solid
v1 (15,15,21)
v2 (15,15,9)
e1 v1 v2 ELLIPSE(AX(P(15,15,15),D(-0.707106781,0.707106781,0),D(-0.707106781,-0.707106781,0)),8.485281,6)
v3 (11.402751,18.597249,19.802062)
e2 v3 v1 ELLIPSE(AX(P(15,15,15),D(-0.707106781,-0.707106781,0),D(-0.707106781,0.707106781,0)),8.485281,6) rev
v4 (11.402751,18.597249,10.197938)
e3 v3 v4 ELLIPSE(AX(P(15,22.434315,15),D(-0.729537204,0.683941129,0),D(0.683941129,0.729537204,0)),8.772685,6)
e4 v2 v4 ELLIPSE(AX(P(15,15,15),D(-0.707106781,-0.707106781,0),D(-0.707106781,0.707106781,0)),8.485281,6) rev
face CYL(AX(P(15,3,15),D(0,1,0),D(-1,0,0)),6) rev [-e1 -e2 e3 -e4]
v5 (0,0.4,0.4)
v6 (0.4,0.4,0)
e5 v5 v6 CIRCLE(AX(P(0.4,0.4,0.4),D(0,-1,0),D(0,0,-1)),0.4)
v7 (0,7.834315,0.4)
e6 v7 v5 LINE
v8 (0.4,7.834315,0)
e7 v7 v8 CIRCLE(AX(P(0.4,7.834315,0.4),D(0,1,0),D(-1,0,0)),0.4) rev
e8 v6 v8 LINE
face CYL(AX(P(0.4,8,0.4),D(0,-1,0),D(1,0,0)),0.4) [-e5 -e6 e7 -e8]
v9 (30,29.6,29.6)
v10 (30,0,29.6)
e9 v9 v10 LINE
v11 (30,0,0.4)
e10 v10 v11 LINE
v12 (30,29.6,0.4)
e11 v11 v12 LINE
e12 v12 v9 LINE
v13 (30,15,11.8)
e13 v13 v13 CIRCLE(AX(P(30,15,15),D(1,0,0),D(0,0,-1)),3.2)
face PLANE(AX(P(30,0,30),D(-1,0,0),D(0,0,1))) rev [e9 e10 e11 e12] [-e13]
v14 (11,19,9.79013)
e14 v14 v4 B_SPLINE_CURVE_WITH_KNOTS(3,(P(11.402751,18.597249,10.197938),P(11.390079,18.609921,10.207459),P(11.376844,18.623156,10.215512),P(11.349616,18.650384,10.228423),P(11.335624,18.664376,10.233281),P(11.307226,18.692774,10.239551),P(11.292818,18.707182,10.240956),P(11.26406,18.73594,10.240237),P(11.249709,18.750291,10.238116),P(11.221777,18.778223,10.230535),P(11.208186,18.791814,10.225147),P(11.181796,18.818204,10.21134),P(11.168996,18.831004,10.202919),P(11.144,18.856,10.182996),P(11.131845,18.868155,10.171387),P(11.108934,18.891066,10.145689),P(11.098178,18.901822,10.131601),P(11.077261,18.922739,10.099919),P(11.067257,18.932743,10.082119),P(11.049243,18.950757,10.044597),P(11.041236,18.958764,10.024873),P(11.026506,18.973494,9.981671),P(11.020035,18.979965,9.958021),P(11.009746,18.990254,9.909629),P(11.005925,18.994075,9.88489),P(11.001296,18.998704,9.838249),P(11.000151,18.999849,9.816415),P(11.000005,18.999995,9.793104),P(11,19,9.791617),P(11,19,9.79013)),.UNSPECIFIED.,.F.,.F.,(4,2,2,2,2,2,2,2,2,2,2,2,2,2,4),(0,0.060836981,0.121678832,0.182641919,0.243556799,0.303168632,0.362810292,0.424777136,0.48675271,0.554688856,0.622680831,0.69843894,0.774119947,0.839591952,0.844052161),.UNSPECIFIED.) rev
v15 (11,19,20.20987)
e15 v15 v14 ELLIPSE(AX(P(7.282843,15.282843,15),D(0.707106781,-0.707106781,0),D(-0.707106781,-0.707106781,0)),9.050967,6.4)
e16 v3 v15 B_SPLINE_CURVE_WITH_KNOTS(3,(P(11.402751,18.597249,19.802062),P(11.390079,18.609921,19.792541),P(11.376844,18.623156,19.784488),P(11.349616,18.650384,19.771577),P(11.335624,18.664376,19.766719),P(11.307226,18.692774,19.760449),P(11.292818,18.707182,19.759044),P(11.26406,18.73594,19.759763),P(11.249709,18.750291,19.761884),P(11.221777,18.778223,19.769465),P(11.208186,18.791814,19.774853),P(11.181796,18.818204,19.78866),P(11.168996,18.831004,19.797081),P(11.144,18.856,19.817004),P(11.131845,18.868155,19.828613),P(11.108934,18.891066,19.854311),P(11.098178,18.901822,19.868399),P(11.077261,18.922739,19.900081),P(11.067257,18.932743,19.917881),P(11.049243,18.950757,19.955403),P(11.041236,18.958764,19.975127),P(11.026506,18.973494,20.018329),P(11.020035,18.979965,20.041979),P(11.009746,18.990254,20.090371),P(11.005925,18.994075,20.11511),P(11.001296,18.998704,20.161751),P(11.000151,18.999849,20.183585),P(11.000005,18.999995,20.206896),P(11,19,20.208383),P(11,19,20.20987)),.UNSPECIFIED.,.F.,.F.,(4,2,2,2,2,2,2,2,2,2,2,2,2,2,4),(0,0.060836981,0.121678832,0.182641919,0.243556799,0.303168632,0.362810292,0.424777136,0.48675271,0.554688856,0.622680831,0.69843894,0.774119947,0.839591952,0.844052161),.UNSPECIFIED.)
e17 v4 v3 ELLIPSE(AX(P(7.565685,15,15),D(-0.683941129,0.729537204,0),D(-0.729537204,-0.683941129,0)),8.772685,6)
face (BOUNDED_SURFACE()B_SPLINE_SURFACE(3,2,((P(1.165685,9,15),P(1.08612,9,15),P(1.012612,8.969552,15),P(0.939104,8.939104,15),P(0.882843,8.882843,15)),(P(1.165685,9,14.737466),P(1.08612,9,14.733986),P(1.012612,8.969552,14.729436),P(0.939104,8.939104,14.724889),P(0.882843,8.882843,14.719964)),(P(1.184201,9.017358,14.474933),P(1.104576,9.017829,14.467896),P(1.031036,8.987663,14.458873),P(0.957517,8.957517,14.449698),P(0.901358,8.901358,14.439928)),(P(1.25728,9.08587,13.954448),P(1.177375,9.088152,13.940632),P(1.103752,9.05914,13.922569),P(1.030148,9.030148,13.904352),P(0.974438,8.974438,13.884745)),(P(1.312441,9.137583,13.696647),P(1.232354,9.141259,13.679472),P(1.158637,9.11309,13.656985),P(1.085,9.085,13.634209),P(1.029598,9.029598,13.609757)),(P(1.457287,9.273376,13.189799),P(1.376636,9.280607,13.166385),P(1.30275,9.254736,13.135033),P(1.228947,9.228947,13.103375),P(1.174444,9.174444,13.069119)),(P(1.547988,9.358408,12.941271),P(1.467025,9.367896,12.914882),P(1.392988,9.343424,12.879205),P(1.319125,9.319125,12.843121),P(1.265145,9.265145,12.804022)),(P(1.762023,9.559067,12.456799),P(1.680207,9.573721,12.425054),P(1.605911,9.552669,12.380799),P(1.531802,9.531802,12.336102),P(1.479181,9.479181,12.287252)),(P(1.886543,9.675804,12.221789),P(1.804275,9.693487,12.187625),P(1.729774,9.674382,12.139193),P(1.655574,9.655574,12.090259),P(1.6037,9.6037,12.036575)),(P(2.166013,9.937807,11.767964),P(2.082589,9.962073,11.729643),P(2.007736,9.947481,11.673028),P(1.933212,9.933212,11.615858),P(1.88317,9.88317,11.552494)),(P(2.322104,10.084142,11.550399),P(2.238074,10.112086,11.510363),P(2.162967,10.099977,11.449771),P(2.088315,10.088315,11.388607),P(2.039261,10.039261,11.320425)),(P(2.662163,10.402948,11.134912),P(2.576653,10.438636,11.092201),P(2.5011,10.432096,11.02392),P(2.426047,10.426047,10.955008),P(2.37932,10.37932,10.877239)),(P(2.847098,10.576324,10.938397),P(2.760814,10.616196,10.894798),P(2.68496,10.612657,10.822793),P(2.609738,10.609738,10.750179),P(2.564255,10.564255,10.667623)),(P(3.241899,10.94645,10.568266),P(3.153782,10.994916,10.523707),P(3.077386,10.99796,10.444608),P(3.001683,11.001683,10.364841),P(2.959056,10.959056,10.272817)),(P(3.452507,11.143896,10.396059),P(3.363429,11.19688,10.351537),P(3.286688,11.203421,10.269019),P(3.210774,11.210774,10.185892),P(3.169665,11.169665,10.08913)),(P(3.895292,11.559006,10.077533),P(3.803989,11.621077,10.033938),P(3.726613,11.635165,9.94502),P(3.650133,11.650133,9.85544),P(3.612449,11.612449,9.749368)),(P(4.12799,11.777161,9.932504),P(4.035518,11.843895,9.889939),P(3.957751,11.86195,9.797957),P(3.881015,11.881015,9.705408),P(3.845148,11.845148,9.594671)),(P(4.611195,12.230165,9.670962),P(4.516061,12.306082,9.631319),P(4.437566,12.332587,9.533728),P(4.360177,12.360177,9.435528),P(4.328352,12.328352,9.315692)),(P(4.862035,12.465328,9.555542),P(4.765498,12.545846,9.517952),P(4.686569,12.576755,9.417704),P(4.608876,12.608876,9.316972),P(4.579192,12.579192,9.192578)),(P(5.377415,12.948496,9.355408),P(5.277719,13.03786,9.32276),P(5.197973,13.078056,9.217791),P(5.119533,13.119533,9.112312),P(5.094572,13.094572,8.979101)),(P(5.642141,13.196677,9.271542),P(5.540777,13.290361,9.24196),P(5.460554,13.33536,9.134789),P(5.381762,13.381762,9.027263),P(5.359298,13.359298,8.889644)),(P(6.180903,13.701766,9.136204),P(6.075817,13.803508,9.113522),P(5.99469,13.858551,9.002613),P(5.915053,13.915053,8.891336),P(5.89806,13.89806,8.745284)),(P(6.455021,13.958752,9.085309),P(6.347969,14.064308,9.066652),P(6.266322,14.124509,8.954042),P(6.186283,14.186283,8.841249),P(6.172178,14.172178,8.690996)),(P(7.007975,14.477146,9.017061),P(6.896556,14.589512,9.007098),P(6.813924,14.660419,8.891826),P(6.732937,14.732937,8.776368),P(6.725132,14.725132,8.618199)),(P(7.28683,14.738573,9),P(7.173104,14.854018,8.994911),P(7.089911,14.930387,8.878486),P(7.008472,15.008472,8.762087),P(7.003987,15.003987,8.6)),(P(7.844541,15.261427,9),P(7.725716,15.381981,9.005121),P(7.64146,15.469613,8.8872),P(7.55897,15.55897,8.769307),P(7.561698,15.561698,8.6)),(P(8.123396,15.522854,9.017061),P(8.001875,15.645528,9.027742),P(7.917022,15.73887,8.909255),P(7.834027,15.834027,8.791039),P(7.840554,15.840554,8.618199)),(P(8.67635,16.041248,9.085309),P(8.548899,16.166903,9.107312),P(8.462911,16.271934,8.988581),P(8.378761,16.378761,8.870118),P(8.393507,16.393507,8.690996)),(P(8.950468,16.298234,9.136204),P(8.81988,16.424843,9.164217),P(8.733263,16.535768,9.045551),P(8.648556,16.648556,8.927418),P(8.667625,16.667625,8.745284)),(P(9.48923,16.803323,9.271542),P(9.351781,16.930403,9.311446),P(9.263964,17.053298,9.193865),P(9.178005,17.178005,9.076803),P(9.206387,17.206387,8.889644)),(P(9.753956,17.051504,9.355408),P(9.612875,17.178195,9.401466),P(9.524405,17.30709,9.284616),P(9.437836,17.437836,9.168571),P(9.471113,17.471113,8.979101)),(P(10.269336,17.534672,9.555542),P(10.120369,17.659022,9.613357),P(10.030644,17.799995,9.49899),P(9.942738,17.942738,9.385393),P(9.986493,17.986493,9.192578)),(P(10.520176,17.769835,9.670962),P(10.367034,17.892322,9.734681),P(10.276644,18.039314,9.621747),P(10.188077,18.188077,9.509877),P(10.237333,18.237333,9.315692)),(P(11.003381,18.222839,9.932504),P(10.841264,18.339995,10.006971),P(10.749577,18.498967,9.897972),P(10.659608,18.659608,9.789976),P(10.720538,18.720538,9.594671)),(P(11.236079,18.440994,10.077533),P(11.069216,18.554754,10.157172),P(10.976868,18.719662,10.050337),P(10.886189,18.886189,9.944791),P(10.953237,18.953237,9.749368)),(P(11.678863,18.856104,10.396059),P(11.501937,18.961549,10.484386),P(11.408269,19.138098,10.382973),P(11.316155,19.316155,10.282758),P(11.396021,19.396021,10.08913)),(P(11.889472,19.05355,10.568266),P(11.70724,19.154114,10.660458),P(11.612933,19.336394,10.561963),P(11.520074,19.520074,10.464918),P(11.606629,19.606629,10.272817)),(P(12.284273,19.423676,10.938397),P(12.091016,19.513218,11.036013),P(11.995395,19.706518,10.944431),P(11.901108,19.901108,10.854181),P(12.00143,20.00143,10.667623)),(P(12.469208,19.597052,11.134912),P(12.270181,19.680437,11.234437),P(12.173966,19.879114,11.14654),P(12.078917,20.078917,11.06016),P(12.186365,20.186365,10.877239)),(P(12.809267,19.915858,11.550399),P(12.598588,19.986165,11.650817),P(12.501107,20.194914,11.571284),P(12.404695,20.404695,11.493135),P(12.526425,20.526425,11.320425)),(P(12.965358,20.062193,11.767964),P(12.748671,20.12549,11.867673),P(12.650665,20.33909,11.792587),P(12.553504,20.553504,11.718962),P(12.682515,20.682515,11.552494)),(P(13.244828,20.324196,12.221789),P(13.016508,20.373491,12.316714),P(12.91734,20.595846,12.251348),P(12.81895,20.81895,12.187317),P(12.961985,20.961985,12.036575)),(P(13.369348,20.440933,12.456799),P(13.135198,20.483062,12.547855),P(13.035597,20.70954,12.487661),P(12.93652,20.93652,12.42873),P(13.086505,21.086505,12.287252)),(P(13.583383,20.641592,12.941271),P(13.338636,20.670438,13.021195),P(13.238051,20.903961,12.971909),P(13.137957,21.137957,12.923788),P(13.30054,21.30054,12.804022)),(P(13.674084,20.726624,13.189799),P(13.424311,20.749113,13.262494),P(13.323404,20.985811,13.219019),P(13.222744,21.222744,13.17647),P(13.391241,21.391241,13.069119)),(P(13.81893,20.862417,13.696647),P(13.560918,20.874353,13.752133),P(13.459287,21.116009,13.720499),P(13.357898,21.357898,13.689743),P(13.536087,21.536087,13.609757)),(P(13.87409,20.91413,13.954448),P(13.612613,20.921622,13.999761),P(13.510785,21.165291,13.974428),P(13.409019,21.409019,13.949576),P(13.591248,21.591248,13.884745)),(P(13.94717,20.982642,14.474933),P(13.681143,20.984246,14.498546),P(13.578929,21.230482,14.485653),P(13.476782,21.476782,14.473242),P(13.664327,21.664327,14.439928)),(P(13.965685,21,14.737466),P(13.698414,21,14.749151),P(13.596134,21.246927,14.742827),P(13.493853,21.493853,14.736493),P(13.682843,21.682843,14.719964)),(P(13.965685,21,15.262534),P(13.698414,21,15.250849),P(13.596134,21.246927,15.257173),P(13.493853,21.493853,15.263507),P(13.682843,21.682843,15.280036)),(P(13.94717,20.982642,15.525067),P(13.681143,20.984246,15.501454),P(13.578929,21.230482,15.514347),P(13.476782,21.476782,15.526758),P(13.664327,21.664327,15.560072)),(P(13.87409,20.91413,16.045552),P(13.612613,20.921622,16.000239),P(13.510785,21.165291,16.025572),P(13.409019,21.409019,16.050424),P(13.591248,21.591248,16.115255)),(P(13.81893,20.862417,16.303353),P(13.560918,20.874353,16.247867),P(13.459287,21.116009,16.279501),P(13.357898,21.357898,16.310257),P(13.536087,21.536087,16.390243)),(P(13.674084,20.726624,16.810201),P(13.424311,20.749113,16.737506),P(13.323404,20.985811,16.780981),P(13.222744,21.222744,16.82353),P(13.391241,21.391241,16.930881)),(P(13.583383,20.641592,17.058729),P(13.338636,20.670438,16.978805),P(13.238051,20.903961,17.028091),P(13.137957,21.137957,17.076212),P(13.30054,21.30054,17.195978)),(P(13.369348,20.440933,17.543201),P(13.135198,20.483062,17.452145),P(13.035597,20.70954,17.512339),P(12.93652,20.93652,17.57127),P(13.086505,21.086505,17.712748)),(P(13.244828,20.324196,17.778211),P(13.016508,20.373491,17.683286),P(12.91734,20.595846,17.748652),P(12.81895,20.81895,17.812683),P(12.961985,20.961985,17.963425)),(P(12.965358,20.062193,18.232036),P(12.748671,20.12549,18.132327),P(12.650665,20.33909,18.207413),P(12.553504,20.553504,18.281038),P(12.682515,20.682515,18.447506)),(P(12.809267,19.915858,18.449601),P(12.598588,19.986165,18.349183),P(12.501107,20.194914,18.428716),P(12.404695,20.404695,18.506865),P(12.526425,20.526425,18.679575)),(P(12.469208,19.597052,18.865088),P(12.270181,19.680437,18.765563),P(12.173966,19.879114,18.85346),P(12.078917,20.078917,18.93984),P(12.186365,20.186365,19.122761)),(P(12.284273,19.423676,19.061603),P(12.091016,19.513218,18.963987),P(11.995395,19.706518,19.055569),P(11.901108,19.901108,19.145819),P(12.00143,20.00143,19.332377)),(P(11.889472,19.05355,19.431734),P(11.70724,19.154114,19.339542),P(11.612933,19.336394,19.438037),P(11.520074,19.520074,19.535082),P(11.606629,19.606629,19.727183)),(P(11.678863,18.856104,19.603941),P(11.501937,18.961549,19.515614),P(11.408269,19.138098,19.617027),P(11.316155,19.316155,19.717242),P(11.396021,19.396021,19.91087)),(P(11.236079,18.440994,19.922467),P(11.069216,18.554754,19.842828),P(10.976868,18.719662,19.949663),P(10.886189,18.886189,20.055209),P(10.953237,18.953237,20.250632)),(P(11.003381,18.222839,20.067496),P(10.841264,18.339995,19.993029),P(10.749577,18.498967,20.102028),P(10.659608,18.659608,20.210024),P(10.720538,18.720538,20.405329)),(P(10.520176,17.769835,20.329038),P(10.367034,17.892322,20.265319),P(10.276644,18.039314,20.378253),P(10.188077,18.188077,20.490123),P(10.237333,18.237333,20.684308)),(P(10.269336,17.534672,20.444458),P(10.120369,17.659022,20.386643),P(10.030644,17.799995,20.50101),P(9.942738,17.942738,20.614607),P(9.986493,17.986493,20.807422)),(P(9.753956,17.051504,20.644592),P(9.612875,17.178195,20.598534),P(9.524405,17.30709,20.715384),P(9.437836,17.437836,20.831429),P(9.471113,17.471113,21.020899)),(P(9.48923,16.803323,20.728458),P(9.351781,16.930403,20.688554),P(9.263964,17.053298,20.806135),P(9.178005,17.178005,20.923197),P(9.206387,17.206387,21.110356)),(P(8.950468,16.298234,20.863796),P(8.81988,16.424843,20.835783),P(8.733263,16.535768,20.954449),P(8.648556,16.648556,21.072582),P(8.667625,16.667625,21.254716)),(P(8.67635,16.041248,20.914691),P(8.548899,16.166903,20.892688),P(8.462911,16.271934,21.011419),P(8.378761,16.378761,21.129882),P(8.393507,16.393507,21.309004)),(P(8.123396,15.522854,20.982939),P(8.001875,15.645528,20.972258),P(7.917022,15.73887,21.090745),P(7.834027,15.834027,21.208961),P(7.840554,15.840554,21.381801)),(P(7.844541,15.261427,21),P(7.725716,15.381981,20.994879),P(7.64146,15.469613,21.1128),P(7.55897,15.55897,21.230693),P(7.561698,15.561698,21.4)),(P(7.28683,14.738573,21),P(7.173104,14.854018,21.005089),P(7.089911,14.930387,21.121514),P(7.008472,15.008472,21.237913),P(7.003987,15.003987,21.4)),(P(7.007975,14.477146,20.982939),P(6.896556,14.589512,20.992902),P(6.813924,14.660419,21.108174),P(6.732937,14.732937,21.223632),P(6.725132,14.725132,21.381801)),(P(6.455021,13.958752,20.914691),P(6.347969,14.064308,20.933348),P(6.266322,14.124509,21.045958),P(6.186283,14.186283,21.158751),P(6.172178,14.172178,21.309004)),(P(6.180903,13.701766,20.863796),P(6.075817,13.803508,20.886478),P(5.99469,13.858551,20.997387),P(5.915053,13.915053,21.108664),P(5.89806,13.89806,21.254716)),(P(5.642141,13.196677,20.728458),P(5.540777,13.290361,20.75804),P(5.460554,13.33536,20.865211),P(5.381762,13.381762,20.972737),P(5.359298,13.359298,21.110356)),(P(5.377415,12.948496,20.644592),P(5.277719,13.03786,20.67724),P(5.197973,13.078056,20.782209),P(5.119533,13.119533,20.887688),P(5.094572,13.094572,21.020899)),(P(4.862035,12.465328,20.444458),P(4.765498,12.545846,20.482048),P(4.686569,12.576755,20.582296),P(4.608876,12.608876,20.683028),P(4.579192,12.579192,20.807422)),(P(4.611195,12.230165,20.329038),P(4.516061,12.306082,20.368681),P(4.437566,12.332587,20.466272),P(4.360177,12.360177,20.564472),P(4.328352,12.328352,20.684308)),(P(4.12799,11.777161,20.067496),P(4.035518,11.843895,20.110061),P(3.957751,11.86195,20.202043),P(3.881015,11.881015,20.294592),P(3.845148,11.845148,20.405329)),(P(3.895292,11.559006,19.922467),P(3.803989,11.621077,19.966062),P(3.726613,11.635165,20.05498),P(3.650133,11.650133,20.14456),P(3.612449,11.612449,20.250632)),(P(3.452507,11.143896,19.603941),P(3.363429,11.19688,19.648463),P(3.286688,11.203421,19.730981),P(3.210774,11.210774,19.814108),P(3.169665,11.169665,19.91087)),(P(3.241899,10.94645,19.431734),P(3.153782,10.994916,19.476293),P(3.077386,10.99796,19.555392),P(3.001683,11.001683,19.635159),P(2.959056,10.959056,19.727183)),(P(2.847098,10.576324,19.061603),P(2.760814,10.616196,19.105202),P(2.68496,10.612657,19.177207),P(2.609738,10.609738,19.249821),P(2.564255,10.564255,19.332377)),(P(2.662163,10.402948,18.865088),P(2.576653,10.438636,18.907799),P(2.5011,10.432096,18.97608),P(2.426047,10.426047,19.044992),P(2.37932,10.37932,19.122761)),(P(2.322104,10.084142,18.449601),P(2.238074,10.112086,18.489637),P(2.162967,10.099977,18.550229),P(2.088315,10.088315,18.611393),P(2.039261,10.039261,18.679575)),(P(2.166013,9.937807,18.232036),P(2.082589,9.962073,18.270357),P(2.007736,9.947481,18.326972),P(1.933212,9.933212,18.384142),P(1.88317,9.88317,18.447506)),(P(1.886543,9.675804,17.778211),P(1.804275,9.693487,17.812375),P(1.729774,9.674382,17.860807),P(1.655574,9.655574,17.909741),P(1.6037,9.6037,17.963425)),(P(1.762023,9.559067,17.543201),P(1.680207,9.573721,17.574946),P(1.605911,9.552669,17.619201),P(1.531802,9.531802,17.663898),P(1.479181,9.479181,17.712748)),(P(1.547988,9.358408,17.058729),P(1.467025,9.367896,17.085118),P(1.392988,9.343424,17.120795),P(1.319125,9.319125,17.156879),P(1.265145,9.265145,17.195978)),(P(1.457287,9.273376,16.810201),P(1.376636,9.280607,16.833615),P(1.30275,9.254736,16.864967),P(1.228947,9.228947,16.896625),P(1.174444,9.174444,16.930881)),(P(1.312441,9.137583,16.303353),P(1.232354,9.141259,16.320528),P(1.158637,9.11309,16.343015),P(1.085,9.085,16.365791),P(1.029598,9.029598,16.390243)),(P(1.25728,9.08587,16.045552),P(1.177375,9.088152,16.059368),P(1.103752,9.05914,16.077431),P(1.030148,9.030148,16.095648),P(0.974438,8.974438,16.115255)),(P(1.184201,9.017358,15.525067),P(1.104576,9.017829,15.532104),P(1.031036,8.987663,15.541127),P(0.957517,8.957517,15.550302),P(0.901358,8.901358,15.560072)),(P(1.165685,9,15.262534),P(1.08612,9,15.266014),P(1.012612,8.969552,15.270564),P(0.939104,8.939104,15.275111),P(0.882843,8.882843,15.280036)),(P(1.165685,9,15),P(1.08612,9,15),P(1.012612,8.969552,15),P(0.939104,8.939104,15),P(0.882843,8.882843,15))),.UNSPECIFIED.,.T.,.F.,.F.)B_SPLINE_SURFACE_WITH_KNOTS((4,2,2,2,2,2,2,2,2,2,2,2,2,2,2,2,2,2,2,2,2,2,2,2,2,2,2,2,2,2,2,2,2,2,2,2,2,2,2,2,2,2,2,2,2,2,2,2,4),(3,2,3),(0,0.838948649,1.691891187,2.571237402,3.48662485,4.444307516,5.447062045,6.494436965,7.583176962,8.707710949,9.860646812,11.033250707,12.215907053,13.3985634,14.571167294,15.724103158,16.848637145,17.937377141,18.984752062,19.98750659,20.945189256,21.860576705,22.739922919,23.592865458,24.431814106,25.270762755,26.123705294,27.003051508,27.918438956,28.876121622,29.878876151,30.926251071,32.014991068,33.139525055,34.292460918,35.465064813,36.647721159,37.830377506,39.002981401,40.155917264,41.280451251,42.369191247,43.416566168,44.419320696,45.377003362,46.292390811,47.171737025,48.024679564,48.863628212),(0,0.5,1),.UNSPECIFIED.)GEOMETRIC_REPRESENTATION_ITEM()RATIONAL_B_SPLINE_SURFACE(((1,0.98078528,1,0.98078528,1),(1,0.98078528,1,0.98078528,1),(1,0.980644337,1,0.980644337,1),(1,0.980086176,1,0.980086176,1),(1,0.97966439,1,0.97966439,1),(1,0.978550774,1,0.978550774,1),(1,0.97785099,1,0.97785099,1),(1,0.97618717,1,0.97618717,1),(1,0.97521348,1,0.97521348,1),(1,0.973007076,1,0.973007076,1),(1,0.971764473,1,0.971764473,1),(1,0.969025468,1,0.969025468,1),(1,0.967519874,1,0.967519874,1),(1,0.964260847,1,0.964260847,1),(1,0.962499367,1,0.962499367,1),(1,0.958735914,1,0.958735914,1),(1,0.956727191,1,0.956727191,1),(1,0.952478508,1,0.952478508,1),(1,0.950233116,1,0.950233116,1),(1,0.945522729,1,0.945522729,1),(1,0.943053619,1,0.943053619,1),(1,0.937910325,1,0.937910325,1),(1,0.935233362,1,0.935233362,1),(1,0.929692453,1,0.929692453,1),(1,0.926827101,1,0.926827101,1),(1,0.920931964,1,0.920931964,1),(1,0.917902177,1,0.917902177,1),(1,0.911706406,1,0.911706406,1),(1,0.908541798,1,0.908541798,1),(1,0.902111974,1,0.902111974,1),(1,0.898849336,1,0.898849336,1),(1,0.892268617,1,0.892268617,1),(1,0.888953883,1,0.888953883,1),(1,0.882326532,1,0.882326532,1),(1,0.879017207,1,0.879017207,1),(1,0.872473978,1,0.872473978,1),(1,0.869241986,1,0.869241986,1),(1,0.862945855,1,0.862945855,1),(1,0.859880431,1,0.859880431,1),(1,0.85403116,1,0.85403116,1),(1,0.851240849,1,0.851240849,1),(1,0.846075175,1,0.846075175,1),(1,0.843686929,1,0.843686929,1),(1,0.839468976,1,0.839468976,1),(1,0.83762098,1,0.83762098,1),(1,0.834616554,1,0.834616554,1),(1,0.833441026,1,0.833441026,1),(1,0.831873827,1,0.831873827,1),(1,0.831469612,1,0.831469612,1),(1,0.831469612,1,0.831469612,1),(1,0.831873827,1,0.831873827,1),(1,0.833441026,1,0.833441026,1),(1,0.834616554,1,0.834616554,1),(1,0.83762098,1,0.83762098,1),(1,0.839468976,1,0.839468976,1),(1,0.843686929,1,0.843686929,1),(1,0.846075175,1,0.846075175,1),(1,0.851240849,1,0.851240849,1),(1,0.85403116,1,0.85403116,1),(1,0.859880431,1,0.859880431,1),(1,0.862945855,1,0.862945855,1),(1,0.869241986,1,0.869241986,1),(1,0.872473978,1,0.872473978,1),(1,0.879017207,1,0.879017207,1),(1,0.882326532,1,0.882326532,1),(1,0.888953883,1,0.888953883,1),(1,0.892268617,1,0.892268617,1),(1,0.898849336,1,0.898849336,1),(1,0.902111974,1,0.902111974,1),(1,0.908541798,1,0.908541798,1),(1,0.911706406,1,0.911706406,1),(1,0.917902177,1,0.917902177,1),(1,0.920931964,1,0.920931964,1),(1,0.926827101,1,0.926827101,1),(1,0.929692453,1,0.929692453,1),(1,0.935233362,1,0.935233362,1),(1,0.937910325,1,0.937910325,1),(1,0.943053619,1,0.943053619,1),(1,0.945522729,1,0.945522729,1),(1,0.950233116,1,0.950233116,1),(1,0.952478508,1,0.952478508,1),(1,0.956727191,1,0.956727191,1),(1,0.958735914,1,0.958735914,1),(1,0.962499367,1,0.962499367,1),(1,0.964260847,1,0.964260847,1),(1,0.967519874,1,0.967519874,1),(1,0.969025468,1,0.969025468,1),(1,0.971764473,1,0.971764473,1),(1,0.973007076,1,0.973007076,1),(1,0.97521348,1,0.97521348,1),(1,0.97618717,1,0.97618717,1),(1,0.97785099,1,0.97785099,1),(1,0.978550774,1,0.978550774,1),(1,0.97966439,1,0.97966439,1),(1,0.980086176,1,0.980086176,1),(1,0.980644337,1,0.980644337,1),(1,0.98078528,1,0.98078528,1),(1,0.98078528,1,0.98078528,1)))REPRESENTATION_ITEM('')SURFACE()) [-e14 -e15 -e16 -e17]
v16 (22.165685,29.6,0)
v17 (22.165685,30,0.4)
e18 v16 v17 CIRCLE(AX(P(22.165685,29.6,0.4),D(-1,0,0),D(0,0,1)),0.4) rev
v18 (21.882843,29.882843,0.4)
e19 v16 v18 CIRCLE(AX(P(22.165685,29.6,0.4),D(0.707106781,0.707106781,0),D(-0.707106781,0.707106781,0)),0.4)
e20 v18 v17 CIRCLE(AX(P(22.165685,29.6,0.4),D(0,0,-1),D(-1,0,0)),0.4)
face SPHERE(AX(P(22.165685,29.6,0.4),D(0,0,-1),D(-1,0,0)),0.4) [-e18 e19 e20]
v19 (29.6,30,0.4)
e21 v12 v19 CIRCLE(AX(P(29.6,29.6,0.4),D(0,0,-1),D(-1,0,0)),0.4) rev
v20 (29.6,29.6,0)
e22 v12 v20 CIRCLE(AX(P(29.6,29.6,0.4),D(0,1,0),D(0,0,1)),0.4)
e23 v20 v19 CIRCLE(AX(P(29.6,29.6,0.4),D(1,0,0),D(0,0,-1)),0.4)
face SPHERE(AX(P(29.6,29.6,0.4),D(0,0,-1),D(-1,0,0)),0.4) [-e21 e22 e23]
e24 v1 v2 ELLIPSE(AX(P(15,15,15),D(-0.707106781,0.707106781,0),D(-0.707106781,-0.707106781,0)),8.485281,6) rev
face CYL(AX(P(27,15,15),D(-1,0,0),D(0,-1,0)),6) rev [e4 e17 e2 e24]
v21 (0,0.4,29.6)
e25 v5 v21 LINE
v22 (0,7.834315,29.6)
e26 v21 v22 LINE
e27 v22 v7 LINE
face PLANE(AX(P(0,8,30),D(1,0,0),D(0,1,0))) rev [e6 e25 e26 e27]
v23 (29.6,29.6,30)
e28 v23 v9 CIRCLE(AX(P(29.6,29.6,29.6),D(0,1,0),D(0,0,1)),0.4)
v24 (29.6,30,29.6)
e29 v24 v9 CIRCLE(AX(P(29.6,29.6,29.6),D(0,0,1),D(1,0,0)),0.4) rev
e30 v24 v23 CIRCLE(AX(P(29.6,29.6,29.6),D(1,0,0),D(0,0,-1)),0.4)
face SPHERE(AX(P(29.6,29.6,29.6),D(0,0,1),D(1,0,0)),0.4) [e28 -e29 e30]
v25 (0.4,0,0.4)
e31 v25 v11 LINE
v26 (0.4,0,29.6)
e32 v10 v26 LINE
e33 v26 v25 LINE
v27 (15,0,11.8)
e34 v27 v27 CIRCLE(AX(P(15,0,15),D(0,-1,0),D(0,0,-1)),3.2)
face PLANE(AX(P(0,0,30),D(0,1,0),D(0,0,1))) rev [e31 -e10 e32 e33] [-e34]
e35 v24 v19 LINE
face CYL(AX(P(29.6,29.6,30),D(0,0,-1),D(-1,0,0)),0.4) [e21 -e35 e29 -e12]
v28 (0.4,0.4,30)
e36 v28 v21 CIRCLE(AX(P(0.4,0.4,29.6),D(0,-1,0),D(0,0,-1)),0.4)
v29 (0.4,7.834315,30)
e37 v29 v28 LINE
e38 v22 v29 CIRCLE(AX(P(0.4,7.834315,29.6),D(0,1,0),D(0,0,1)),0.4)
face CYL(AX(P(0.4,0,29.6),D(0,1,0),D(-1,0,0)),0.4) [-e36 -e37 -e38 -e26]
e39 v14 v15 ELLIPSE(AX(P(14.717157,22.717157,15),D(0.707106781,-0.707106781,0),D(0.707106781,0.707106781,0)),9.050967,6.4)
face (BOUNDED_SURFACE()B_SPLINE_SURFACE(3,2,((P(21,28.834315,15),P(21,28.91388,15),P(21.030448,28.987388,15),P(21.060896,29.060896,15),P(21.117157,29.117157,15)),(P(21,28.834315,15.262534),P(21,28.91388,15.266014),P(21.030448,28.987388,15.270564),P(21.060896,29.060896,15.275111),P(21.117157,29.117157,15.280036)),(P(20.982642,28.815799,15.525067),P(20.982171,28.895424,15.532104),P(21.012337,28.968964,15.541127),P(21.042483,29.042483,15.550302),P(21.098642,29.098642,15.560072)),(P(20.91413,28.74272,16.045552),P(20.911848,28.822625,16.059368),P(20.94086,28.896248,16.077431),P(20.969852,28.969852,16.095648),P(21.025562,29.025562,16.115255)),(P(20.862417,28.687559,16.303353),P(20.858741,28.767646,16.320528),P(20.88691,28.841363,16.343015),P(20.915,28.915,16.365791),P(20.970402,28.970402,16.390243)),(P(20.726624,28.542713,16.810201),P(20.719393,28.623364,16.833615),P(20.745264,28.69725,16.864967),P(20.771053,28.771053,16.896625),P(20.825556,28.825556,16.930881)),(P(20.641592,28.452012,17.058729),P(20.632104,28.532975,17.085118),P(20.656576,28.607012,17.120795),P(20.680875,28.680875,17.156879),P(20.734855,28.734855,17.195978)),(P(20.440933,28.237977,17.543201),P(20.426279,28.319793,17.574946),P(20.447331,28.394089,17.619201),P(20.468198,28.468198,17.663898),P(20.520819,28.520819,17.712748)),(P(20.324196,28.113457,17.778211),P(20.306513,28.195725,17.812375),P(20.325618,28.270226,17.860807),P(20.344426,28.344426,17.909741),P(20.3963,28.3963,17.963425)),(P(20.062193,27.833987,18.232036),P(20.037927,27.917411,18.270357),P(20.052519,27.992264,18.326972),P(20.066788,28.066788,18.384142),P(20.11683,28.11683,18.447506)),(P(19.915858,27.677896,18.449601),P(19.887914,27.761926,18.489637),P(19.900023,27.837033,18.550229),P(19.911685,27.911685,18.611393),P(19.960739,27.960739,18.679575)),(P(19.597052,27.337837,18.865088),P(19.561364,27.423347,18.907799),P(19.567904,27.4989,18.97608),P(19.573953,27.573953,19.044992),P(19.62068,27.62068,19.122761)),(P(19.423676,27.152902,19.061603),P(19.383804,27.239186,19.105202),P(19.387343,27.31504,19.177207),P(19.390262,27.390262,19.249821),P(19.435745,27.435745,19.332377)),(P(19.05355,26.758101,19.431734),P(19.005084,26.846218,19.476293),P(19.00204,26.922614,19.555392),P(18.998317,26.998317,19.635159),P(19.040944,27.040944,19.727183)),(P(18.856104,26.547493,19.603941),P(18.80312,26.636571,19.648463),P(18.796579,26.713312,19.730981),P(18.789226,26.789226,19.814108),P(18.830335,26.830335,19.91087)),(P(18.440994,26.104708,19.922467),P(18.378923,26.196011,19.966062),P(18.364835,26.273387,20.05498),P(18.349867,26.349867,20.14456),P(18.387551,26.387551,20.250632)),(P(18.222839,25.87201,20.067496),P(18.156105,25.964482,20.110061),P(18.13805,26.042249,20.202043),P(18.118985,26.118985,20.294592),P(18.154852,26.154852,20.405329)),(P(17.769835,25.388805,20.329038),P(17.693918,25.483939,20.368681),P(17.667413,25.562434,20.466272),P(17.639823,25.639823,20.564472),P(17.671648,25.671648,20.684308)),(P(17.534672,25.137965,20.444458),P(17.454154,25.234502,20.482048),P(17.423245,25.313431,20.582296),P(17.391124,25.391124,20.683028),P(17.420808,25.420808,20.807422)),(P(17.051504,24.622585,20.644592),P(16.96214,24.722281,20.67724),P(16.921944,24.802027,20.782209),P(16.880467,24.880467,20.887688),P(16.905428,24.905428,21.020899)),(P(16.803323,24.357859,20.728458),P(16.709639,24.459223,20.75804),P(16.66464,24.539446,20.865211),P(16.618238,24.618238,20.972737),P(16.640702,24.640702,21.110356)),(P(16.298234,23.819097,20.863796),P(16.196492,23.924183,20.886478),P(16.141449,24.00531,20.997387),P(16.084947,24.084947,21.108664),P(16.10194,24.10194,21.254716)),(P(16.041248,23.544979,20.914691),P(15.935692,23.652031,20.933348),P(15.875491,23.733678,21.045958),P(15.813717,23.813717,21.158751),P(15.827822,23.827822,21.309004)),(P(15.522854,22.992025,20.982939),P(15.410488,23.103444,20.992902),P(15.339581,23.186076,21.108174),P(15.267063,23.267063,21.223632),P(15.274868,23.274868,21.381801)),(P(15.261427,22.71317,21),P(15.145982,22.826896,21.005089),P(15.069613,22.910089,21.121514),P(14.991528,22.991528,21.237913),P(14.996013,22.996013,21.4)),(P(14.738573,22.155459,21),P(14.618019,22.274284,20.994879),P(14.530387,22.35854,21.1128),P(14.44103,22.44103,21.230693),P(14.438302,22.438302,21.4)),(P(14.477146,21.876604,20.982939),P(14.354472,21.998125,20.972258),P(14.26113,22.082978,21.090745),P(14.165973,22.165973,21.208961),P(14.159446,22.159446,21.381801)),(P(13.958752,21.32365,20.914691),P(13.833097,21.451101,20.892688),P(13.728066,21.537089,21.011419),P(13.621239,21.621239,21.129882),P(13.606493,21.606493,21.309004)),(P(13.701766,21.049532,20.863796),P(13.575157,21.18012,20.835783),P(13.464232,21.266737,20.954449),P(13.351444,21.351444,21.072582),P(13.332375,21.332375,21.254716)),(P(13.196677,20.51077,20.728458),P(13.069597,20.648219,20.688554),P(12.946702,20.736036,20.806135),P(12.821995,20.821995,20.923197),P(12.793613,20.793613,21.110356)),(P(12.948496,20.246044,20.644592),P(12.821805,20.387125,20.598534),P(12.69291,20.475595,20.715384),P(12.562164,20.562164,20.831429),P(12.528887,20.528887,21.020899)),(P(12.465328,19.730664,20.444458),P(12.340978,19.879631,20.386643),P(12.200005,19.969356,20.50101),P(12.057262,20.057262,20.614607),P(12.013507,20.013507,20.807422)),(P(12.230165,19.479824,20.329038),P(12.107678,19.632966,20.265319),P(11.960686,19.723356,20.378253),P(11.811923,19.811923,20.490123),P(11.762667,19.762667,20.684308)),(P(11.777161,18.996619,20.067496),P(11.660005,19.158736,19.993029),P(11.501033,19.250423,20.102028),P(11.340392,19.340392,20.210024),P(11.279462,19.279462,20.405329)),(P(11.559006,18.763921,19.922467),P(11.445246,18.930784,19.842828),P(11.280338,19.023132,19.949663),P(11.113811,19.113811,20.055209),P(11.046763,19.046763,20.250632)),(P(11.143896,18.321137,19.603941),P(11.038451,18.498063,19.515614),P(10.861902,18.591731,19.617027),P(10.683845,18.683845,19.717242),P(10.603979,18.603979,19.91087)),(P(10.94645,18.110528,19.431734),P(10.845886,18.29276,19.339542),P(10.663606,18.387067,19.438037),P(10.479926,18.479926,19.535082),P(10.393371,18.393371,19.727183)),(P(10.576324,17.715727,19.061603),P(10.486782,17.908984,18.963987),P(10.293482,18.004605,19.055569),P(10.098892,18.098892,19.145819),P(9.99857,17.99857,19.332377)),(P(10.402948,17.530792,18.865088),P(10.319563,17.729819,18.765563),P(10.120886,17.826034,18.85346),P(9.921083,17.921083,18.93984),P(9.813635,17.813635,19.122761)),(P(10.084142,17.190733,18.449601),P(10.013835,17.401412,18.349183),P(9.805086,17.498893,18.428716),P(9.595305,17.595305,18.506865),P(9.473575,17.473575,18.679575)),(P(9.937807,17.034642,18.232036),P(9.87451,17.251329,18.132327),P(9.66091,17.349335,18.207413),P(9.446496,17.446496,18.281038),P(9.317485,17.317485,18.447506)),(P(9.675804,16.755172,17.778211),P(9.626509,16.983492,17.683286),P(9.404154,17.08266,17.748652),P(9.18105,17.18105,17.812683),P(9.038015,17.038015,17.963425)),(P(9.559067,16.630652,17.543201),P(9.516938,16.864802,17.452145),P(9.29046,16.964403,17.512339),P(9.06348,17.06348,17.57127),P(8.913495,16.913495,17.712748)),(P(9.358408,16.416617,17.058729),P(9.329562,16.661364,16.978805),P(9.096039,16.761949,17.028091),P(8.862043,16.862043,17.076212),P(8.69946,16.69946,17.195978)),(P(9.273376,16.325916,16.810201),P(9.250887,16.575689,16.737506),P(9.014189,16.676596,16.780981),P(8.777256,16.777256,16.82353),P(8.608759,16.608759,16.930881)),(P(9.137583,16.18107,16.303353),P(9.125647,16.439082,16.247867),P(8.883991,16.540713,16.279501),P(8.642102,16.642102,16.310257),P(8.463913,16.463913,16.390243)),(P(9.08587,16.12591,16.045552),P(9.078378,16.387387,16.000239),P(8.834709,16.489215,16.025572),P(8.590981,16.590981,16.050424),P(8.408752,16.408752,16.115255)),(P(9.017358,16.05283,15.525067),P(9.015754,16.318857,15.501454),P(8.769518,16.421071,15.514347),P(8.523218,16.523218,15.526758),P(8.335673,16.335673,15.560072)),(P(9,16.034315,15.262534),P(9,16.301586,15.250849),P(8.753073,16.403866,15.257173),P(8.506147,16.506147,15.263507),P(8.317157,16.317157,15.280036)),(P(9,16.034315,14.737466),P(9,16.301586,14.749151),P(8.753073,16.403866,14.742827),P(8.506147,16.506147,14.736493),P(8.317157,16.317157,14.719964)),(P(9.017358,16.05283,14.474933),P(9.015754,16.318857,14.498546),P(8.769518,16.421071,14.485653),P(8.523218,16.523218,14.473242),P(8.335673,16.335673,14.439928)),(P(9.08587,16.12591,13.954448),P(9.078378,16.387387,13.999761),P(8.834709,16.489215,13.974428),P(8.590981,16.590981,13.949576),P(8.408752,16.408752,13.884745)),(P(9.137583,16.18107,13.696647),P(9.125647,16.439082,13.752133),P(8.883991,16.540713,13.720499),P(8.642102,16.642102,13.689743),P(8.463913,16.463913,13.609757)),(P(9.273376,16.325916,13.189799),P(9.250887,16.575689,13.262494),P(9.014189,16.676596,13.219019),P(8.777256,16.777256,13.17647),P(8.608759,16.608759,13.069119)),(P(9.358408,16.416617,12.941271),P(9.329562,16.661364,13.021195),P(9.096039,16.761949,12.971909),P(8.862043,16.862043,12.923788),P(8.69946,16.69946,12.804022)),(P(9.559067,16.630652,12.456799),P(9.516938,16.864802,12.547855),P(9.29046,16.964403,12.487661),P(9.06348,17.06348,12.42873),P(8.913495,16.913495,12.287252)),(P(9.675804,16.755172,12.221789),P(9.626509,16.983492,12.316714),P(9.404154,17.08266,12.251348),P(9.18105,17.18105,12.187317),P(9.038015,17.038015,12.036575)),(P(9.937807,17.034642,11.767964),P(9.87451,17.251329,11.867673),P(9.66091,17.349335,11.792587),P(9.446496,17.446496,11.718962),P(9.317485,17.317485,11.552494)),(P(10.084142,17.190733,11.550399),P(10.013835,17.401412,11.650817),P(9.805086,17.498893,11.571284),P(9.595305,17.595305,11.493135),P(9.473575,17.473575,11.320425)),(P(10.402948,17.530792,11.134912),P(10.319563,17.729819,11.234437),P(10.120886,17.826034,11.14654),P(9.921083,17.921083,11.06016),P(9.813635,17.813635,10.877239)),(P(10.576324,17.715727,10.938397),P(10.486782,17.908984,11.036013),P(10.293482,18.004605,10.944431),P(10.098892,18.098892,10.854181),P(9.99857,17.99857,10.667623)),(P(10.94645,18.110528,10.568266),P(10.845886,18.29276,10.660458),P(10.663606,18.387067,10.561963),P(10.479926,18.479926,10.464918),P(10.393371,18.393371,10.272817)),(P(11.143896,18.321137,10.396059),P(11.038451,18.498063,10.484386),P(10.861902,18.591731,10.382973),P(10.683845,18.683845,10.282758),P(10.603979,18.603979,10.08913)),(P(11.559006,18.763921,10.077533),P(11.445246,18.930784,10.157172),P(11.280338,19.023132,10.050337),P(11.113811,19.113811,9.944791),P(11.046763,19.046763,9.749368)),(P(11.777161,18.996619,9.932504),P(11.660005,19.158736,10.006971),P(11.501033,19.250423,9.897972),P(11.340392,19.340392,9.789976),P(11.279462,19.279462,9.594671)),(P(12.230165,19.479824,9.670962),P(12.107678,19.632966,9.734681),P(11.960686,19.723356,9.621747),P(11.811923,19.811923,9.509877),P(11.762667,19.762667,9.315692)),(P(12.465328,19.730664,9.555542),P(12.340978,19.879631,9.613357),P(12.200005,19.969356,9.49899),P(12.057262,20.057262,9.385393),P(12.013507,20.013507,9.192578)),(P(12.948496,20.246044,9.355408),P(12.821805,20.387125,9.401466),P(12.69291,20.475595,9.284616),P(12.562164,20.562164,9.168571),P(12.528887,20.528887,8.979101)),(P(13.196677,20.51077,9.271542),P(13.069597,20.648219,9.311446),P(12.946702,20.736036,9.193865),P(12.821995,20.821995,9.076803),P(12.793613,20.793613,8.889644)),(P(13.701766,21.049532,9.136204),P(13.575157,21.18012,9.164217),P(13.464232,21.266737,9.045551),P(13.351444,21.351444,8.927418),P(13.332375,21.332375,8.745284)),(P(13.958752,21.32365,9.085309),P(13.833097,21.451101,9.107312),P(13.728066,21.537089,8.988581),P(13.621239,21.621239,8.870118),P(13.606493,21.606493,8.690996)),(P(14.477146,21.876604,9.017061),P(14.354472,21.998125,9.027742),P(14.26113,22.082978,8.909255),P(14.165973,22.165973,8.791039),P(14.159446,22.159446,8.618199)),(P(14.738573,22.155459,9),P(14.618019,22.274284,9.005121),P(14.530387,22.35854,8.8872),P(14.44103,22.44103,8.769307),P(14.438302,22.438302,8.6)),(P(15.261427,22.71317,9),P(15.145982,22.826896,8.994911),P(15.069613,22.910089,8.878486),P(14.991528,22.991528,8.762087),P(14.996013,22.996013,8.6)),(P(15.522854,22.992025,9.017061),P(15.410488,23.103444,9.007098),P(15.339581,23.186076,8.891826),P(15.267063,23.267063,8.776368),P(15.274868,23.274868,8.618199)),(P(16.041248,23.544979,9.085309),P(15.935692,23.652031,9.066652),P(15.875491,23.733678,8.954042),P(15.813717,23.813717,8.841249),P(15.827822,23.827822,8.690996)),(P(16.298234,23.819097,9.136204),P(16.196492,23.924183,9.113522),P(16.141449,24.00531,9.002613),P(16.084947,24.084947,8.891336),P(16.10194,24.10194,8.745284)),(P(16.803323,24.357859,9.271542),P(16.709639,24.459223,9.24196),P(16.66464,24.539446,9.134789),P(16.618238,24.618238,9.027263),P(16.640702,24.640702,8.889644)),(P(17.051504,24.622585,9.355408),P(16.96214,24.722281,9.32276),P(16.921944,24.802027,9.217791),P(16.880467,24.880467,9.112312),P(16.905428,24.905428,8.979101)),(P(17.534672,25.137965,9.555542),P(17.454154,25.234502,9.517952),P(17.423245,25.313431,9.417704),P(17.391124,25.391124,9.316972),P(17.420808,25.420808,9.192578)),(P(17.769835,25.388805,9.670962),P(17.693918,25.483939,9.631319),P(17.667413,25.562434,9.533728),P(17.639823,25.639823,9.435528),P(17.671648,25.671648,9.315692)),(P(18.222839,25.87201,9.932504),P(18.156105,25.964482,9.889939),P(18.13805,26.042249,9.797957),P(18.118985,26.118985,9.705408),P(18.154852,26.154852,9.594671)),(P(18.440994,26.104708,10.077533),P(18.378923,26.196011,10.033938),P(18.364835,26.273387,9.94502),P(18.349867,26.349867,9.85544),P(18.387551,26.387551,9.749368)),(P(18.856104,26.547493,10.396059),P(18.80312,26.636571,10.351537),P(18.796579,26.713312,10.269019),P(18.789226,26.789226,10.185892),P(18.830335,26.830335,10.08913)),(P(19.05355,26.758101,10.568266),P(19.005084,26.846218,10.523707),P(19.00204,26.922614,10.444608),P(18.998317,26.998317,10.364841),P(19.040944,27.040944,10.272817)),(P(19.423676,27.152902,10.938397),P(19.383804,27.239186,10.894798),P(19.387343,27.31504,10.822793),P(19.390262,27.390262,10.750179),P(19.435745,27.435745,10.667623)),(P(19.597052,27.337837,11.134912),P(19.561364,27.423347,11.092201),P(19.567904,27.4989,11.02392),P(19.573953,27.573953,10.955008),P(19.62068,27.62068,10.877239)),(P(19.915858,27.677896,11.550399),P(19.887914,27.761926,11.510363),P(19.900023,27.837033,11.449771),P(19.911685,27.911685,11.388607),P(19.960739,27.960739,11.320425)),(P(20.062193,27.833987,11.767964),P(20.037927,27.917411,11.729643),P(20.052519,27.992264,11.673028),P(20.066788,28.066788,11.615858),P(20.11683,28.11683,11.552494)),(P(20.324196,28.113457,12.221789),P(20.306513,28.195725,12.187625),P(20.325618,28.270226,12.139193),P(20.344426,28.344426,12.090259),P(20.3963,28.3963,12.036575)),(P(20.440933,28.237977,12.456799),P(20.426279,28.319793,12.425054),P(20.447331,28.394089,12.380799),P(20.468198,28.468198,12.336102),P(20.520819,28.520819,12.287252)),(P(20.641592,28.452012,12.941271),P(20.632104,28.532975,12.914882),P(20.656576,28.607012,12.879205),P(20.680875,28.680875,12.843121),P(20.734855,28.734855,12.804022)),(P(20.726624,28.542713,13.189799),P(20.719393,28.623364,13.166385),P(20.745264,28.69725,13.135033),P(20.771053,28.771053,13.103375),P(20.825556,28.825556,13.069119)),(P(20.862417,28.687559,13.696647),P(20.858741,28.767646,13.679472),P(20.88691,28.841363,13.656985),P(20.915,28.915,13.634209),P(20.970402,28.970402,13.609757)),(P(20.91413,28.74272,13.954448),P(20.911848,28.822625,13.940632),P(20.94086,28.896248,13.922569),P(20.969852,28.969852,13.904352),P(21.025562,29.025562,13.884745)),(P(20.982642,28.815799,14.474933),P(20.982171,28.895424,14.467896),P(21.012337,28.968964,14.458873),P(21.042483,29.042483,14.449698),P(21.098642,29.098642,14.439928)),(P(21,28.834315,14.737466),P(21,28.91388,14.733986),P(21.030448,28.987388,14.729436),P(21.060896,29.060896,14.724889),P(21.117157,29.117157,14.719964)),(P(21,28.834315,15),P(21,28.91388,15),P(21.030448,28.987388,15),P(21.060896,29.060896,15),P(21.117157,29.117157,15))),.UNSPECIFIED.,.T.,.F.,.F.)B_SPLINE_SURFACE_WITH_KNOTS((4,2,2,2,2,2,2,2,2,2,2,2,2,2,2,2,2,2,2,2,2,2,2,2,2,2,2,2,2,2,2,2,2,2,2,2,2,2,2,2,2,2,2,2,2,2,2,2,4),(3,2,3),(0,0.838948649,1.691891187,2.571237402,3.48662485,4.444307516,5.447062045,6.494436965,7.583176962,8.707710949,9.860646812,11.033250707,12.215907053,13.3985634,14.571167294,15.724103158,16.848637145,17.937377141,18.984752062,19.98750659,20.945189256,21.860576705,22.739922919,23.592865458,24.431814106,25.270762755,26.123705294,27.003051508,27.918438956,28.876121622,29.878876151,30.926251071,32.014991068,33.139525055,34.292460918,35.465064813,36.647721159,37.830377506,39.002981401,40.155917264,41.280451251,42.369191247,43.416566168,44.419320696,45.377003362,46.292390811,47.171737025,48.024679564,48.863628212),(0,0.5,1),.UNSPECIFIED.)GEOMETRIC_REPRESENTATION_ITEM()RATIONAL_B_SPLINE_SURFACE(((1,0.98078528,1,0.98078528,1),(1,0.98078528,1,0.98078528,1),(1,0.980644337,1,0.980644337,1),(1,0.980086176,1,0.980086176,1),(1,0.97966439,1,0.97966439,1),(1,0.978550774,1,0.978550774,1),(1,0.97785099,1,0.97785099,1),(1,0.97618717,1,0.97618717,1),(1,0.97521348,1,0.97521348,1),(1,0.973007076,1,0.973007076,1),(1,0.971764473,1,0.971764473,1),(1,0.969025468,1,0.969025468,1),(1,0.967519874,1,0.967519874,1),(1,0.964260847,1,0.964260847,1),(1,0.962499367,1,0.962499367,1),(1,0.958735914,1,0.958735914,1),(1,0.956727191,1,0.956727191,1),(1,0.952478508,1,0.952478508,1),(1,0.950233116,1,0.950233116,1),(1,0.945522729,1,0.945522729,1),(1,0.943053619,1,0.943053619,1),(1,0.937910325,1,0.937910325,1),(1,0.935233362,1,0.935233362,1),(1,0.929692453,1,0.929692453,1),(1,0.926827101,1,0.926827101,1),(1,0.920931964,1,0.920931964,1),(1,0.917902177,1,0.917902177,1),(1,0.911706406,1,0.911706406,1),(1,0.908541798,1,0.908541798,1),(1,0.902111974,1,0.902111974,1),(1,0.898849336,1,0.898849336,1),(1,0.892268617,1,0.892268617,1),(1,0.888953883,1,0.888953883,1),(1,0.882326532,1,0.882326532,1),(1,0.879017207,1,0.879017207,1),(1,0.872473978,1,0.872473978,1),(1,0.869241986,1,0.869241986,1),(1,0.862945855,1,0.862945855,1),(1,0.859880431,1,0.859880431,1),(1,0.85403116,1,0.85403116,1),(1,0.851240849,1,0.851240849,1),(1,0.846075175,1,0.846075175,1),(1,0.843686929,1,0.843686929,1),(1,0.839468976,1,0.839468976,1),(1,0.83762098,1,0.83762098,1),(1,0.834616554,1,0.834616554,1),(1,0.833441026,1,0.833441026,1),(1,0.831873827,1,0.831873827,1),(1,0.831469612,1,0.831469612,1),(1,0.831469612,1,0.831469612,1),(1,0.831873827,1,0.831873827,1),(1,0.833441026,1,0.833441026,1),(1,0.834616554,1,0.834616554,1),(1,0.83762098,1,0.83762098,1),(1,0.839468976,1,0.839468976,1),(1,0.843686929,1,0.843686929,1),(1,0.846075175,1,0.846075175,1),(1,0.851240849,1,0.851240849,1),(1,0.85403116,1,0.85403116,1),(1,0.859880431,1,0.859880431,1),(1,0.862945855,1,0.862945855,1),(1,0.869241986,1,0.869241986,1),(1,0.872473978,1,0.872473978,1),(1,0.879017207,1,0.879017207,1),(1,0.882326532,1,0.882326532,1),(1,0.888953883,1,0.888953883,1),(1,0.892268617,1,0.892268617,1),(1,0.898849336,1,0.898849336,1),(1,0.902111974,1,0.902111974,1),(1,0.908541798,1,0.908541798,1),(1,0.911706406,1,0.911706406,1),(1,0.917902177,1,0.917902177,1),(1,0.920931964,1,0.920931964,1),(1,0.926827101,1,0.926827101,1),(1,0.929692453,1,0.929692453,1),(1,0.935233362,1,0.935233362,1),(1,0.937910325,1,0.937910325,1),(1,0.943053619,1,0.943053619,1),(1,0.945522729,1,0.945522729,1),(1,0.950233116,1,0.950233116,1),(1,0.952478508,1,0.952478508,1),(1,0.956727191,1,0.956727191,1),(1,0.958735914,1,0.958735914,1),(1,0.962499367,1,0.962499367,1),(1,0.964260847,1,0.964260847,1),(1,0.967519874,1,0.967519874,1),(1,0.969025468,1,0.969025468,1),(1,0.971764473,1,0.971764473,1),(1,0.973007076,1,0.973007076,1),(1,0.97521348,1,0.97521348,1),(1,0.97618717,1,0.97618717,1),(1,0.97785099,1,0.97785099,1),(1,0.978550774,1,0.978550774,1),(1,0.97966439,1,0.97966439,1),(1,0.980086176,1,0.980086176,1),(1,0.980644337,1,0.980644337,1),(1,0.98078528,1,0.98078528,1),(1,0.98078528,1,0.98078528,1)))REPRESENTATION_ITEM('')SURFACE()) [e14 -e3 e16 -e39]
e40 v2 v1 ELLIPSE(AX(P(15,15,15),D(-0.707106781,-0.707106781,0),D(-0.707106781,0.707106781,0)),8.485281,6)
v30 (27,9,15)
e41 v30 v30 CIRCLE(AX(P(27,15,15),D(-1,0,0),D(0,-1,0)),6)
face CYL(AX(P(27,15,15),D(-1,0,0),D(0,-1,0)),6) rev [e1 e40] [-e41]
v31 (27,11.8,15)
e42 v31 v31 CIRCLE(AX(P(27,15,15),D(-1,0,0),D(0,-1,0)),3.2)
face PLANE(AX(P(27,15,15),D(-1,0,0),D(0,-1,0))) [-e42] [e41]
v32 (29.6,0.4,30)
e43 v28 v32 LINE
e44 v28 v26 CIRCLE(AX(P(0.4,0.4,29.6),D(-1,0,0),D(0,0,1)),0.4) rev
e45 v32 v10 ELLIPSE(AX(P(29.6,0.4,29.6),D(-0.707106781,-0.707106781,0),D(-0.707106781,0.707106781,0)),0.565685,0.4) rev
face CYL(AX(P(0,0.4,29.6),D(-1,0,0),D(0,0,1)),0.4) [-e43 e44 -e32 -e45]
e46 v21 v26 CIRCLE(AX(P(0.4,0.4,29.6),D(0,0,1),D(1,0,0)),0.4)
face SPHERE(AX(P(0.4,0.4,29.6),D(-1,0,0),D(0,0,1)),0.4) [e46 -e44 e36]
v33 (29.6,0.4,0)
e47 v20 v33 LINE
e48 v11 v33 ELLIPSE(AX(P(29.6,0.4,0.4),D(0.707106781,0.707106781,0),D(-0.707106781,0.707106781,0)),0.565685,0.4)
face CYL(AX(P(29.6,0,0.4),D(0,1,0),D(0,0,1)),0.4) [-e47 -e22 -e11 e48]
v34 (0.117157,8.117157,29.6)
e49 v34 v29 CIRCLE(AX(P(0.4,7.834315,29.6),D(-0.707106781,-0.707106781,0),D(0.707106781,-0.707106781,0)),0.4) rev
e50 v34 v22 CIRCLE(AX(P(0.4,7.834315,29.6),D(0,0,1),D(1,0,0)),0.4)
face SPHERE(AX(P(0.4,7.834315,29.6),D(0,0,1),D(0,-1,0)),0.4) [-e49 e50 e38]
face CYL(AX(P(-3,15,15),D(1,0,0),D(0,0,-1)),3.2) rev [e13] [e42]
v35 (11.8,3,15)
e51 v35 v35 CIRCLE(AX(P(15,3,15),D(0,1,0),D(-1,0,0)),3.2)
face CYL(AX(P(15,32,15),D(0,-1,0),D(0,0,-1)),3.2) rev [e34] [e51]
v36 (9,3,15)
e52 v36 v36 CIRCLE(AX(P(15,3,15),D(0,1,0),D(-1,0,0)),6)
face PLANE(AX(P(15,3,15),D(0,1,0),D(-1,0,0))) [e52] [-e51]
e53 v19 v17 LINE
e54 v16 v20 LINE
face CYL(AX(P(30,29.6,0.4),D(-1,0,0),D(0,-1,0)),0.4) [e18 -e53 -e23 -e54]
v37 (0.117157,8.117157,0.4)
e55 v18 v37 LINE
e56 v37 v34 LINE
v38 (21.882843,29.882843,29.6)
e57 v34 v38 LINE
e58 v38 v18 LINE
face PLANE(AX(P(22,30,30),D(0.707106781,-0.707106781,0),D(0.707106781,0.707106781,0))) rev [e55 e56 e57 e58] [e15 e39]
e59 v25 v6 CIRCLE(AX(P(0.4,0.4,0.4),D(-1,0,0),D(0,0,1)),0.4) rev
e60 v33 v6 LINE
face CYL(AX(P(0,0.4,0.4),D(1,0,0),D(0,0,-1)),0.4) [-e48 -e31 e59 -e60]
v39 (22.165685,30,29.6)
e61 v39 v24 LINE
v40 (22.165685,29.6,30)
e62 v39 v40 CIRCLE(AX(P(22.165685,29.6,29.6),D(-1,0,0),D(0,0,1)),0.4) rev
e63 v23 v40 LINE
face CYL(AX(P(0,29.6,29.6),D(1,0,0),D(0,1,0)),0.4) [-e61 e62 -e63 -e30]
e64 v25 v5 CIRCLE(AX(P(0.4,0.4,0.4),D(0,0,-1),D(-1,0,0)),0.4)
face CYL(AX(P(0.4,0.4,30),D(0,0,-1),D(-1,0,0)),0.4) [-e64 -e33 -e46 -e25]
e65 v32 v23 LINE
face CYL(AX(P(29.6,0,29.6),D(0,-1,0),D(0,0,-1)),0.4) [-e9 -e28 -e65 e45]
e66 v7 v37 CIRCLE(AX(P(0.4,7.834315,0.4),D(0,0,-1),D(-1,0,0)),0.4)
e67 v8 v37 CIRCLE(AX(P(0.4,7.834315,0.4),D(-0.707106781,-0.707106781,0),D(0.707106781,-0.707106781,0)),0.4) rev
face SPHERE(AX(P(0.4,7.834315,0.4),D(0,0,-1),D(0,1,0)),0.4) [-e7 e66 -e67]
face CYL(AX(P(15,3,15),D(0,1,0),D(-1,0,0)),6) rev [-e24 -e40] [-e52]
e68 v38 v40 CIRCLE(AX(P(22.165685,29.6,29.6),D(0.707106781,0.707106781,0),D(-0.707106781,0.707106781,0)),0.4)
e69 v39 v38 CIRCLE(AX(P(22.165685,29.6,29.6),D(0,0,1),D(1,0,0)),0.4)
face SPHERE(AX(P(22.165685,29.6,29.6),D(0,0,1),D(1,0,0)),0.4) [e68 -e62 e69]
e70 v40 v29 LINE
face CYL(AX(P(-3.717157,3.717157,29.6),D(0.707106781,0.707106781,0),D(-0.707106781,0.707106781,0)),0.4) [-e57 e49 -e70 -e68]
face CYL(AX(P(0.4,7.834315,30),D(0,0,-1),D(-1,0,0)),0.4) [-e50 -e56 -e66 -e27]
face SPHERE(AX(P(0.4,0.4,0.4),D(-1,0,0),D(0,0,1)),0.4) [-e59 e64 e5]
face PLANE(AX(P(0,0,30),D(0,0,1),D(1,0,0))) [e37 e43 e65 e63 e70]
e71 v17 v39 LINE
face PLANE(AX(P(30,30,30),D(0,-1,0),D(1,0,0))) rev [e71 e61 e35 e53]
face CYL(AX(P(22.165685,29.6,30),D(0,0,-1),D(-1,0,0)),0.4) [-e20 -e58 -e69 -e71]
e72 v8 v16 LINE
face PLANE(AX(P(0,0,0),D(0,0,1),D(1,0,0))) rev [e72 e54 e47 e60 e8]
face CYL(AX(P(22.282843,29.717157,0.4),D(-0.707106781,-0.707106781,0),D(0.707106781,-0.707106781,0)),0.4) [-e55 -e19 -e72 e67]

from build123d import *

# Parameters (mm, degrees)
BOSS_EXTRUDE1_DEPTH = 30
SKETCH3_R           = 3.2
CUT_EXTRUDE8_DEPTH  = 33
SKETCH5_R           = 3.2
CUT_EXTRUDE5_DEPTH  = 32
CUT_EXTRUDE9_START  = -27
SKETCH8_R           = 6
SKETCH8_R_2         = 3.2
CUT_EXTRUDE9_DEPTH  = 27
CUT_EXTRUDE10_START = -27
SKETCH7_R           = 6
SKETCH7_R_2         = 3.2
CUT_EXTRUDE10_DEPTH = 27
FILLET6_R           = 0.4


with BuildPart() as part:
    # Sketch2 → Boss-Extrude1 (new body)
    with BuildSketch(Plane.XY):
        Polygon((0, 0), (30, 0), (30, 30), (22, 30), (0, 8), align=None)
    extrude(amount=BOSS_EXTRUDE1_DEPTH)

    # Sketch3 → Cut-Extrude8 (cut)
    with BuildSketch(Plane(origin=(30, 0, 0), x_dir=(0, 0, -1), z_dir=(1, 0, 0))):
        with Locations((-15, 15)):
            Circle(SKETCH3_R)
    extrude(amount=-CUT_EXTRUDE8_DEPTH, mode=Mode.SUBTRACT)

    # Sketch5 → Cut-Extrude5 (cut)
    with BuildSketch(Plane.XZ):
        with Locations((15, 15)):
            Circle(SKETCH5_R)
    extrude(amount=-CUT_EXTRUDE5_DEPTH, mode=Mode.SUBTRACT)

    # Sketch8 → Cut-Extrude9 (cut)
    with BuildSketch(Plane.ZY.offset(CUT_EXTRUDE9_START)):
        with Locations((15, 15)):
            Circle(SKETCH8_R)
        with Locations((15, 15)):
            Circle(SKETCH8_R_2, mode=Mode.SUBTRACT)
    extrude(amount=CUT_EXTRUDE9_DEPTH, mode=Mode.SUBTRACT)

    # Sketch7 → Cut-Extrude10 (cut)
    with BuildSketch(Plane(origin=(0, 30, 0), x_dir=(1, 0, 0), z_dir=(0, 1, 0)).offset(CUT_EXTRUDE10_START)):
        with Locations((15, -15)):
            Circle(SKETCH7_R)
        with Locations((15, -15)):
            Circle(SKETCH7_R_2, mode=Mode.SUBTRACT)
    extrude(amount=CUT_EXTRUDE10_DEPTH, mode=Mode.SUBTRACT)

    # Fillet6
    fillet6_edges = [part.edges().sort_by_distance(p)[0] for p in [
        (30, 30, 15),
        (26, 30, 30),
        (30, 15, 30),
        (15, 0, 30),
        (0, 4, 30),
        (0, 0, 15),
        (15, 0, 0),
        (30, 15, 0),
        (26, 30, 0),
        (0, 4, 0),
        (22, 30, 15),
        (11, 19, 30),
        (0, 8, 15),
        (11, 19, 0),
        (1.671913993, 9.671913993, 12.241105383),
        (16.935572078, 24.935572078, 9.320778158),
    ]]
    fillet(fillet6_edges, radius=FILLET6_R)


solid = part.part
